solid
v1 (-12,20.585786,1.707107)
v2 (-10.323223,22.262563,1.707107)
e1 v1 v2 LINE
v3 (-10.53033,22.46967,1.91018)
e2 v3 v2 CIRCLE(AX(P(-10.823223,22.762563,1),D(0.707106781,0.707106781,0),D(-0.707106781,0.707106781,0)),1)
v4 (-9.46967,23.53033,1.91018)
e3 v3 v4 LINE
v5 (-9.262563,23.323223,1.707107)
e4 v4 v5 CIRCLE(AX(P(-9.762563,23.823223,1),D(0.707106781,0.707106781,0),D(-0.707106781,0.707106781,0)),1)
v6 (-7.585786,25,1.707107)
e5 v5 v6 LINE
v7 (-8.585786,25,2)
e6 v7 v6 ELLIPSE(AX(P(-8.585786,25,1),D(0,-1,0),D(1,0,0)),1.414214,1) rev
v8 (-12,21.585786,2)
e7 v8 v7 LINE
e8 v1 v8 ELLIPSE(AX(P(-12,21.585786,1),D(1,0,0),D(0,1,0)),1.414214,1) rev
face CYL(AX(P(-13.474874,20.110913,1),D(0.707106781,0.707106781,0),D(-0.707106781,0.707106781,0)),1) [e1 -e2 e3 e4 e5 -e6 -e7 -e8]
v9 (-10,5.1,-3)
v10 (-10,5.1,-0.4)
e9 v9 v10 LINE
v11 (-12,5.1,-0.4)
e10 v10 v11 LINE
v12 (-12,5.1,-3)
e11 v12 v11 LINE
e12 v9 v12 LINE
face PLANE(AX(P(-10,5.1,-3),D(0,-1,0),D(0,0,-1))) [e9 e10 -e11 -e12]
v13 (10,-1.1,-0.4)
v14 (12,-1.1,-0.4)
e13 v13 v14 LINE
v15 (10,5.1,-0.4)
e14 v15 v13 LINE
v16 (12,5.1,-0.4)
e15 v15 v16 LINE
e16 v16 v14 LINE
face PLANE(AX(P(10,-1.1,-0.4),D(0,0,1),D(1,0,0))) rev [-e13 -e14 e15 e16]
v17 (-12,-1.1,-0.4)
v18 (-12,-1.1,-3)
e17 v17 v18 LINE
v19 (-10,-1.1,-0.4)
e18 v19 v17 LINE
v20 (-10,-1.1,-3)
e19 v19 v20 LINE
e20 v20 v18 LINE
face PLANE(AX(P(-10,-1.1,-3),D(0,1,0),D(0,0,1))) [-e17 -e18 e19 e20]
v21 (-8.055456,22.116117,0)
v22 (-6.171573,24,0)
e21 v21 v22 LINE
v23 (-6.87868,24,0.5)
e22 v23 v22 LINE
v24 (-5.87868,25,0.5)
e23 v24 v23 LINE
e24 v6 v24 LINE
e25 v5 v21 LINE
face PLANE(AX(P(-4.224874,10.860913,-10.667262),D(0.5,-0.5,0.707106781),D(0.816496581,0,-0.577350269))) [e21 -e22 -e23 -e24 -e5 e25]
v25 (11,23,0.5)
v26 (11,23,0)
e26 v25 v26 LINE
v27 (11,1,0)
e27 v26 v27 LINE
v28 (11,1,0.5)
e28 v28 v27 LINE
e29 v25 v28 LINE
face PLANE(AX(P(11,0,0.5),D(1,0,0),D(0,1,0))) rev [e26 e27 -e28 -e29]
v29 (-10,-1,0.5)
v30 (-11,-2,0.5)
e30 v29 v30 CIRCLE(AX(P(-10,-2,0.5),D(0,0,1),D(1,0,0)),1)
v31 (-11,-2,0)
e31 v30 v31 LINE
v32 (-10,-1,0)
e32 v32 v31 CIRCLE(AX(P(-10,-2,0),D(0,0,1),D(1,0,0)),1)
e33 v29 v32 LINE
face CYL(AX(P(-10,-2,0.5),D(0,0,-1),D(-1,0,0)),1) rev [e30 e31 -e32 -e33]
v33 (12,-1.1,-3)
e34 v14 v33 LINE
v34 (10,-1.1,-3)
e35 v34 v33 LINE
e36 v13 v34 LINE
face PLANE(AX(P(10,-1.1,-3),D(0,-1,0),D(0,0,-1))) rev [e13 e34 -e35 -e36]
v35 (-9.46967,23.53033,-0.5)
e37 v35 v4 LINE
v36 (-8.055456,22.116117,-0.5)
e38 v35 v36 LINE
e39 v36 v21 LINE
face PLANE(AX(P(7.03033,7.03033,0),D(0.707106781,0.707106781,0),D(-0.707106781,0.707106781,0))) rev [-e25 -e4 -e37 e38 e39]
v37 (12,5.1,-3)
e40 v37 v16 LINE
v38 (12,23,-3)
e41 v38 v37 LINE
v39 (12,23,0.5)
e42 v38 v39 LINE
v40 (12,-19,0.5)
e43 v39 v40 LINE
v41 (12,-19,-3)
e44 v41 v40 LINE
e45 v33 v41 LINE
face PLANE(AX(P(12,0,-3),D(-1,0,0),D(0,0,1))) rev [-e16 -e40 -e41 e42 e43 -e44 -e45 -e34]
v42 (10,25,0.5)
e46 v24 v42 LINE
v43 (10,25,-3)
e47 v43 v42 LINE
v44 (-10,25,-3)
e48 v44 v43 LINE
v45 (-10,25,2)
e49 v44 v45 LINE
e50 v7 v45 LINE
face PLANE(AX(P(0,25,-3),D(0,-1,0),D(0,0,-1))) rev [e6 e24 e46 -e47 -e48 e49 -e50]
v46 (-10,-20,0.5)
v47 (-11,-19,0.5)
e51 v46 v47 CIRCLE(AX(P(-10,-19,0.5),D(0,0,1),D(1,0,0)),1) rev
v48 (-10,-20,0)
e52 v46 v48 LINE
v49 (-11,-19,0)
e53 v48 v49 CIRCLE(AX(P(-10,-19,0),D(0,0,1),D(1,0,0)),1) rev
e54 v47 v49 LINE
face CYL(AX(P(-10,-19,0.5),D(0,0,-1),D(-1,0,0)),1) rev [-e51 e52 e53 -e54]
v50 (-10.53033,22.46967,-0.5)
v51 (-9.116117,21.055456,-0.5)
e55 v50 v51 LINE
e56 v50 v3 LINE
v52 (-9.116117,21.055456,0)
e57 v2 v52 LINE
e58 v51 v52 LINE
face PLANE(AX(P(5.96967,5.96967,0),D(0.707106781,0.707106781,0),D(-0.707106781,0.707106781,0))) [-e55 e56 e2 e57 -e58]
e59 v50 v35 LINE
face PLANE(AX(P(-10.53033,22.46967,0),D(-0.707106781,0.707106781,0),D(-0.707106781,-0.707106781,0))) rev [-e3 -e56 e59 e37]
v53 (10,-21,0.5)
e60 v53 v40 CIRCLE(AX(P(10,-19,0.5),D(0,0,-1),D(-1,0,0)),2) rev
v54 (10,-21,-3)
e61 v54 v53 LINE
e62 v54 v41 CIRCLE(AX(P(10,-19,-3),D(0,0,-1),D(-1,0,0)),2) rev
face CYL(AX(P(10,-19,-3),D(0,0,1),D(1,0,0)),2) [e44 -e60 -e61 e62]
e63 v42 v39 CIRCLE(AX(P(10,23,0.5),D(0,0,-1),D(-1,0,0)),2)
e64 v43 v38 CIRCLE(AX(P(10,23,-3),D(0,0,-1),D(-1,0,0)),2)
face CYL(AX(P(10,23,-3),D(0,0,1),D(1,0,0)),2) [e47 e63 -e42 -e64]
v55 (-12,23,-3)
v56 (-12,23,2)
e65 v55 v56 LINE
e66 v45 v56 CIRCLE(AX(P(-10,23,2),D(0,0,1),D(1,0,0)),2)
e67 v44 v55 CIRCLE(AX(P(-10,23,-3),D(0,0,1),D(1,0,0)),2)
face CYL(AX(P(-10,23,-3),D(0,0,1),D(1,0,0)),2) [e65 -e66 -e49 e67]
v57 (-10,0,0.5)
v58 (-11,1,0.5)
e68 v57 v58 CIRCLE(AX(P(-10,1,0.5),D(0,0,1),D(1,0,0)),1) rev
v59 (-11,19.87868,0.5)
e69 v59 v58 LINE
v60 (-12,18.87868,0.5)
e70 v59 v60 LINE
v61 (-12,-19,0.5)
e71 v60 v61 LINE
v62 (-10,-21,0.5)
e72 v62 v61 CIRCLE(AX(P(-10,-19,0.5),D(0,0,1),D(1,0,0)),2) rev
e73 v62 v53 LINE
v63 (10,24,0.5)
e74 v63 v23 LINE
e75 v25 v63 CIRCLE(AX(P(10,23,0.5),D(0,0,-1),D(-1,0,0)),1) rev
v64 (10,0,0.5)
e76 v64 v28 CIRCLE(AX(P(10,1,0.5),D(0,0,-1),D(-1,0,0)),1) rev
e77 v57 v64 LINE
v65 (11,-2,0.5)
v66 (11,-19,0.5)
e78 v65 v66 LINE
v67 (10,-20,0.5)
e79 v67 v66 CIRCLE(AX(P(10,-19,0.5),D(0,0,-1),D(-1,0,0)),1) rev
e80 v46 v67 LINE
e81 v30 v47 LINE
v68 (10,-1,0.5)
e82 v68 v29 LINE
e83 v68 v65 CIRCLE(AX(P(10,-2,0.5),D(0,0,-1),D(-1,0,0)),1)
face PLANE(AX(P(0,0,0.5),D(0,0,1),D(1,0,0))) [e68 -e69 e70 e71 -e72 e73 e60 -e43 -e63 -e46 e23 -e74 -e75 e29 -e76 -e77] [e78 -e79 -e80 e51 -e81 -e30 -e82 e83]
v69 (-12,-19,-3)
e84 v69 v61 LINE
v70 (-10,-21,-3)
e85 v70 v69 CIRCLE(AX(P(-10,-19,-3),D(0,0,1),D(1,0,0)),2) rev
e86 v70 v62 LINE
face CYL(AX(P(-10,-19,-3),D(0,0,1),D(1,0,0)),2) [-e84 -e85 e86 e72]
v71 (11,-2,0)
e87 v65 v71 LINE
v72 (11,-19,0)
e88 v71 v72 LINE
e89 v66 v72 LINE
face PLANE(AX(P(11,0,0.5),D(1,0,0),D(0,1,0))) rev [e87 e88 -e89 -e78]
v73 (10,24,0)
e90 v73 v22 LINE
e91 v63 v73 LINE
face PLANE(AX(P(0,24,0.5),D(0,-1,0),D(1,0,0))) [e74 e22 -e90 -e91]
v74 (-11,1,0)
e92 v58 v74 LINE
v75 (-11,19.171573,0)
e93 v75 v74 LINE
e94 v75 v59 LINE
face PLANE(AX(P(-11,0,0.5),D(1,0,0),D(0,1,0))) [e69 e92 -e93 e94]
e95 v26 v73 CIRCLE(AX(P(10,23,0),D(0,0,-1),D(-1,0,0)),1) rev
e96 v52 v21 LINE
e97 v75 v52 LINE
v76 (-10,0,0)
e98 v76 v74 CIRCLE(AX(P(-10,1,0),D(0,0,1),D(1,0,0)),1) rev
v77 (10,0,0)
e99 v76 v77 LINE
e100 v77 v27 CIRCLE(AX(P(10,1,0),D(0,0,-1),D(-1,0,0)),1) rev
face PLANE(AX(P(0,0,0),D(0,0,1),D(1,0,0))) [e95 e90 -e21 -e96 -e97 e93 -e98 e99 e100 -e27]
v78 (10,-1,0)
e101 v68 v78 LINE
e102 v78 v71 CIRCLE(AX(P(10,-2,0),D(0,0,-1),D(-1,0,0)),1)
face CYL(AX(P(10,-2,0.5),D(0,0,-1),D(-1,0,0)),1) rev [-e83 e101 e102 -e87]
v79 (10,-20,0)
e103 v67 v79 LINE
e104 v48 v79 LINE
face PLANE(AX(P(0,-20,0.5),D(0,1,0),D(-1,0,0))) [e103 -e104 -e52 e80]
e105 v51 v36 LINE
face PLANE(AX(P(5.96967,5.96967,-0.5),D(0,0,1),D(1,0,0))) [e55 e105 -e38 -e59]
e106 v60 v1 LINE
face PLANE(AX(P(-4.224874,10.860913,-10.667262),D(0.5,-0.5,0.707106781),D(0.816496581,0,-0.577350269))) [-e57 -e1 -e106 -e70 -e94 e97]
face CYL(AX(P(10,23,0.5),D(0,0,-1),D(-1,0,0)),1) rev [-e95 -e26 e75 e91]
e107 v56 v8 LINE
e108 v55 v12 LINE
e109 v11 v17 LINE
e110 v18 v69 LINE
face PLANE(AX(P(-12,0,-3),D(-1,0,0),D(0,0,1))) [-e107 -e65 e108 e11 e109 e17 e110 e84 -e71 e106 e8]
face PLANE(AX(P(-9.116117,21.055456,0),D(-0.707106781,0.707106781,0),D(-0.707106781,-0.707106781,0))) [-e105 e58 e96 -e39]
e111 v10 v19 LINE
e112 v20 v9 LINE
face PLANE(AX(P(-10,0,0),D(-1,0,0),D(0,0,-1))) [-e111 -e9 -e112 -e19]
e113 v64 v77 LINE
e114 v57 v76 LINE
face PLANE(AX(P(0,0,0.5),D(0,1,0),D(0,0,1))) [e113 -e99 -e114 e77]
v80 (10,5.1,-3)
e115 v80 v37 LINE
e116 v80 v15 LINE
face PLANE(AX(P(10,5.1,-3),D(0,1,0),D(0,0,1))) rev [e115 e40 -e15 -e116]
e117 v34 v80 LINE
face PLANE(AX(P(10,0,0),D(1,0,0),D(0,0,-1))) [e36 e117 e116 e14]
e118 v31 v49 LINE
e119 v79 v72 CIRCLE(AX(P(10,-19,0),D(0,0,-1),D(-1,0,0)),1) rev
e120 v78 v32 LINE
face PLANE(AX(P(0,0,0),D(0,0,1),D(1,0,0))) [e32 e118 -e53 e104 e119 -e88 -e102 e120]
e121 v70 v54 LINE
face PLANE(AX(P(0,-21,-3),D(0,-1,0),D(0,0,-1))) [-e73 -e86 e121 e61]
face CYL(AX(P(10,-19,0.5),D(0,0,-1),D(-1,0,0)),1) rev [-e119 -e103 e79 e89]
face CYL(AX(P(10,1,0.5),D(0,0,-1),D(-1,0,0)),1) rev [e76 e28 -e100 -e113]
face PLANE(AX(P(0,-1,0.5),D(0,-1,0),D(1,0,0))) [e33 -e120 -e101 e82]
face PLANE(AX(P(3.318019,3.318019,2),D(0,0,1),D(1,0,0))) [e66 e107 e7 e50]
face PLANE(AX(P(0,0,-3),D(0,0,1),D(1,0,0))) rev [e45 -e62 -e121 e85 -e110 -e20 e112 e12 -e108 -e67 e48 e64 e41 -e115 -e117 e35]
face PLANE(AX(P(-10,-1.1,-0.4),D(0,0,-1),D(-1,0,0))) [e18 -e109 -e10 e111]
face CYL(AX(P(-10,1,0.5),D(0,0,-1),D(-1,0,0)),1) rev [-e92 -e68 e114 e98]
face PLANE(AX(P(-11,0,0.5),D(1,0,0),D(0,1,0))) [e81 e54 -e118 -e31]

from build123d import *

# Parameters (mm, degrees)
BASE_DEPTH                = 3
CORNER_MARK_DEPTH         = 4.5
CORNER_MARK_DEPTH_BACK    = 4.5
CORNER_SKETCH_3_W         = 2
CORNER_SKETCH_3_H         = 0.5
CORNER_MARK_CUTOUT_DEPTH  = 0.75
CORNER_FIT_CUT_DEPTH      = 32.616432581
CORNER_FIT_CUT_DEPTH_BACK = 32.616432581
BORDER_START              = -3
BORDER_DEPTH              = 3.5
BODY_MIRROR_START         = -3
BODY_MIRROR_DEPTH         = 3
BODY_MIRROR_2_DEPTH       = 0.5
MAGNET_CUTOUT_SKETCH_W    = 2.6
MAGNET_CUTOUT_SKETCH_H    = 6.2
MAGNET_CUTOUT_DEPTH       = 2


with BuildPart() as part:
    # base_sketch → base (new body)
    with BuildSketch(Plane.XY):
        with BuildLine():
            ThreePointArc((-10, 0), (-10.707106781, 0.292893219), (-11, 1))
            Line((-11, 1), (-11, 23))
            ThreePointArc((-11, 23), (-10.707106781, 23.707106781), (-10, 24))
            Line((-10, 24), (0, 24))
            Line((0, 24), (0, 0))
            Line((0, 0), (-10, 0))
        make_face()
        with BuildLine():
            Line((0, -1), (-10, -1))
            ThreePointArc((-10, -1), (-10.707106781, -1.292893219), (-11, -2))
            Line((-11, -2), (-11, -19))
            ThreePointArc((-11, -19), (-10.707106781, -19.707106781), (-10, -20))
            Line((-10, -20), (0, -20))
            Line((0, -20), (0, -1))
        make_face()
        with BuildLine():
            Line((-10, 0), (0, 0))
            Line((0, 0), (0, -1))
            Line((0, -1), (-10, -1))
            ThreePointArc((-10, -1), (-10.707106781, -1.292893219), (-11, -2))
            Line((-11, -2), (-11, -19))
            ThreePointArc((-11, -19), (-10.707106781, -19.707106781), (-10, -20))
            Line((-10, -20), (0, -20))
            Line((0, -20), (0, -21))
            Line((0, -21), (-10, -21))
            ThreePointArc((-10, -21), (-11.414213562, -20.414213562), (-12, -19))
            Line((-12, -19), (-12, 23))
            ThreePointArc((-12, 23), (-11.414213562, 24.414213562), (-10, 25))
            Line((-10, 25), (0, 25))
            Line((0, 25), (0, 24))
            Line((0, 24), (-10, 24))
            ThreePointArc((-10, 24), (-10.707106781, 23.707106781), (-11, 23))
            Line((-11, 23), (-11, 1))
            ThreePointArc((-11, 1), (-10.707106781, 0.292893219), (-10, 0))
        make_face()
    extrude(amount=-BASE_DEPTH)

    # corner_sketch → corner_mark (add, two sides: drawn at the far end of the back side and taken through both)
    with BuildSketch(Plane(origin=(6.5, 6.5, 0), x_dir=(0.7071067811865477, -0.7071067811865475, 0), z_dir=(0.7071067811865475, 0.7071067811865477, 0)).offset(-CORNER_MARK_DEPTH_BACK)):
        with BuildLine():
            Line((-23.334523779, 0), (-25.334523779, 0))
            Line((-25.334523779, 0), (-25.334523779, -2))
            Line((-25.334523779, -2), (-23.748737342, -2))
            ThreePointArc((-23.748737342, -2), (-23.536817216, -1.97728699), (-23.334523779, -1.910179721))
            Line((-23.334523779, -1.910179721), (-23.334523779, 0))
        make_face()
        with BuildLine():
            Line((-21.334523779, 0), (-23.334523779, 0))
            Line((-23.334523779, 0), (-23.334523779, -1.910179721))
            ThreePointArc((-23.334523779, -1.910179721), (-23.178957136, -1.821797126), (-23.04163056, -1.707106781))
            Line((-23.04163056, -1.707106781), (-21.334523779, 0))
        make_face()
    extrude(amount=CORNER_MARK_DEPTH + CORNER_MARK_DEPTH_BACK)

    # corner_sketch<3> → corner_mark_cutout (cut, symmetric)
    with BuildSketch(Plane(origin=(6.5, 6.5, 0), x_dir=(0.7071067811865477, -0.7071067811865475, 0), z_dir=(0.7071067811865475, 0.7071067811865477, 0))):
        with BuildLine():
            Line((-21.334523779, 0), (-23.334523779, 0))
            Line((-23.334523779, 0), (-23.334523779, -1.910179721))
            ThreePointArc((-23.334523779, -1.910179721), (-23.178957136, -1.821797126), (-23.04163056, -1.707106781))
            Line((-23.04163056, -1.707106781), (-21.334523779, 0))
        make_face()
        with Locations((-22.334523779, 0.25)):
            Rectangle(CORNER_SKETCH_3_W, CORNER_SKETCH_3_H)
    extrude(amount=CORNER_MARK_CUTOUT_DEPTH, both=True, mode=Mode.SUBTRACT)

    # Эскиз3 → corner_fit_cut (cut, two sides: drawn at the far end of the back side and taken through both)
    with BuildSketch(Plane(origin=(0, 0, -3), x_dir=(-1, 0, 0), z_dir=(0, 0, -1)).offset(-CORNER_FIT_CUT_DEPTH_BACK)):
        with BuildLine():
            Line((10, 25), (4.949214827, 25))
            Line((4.949214827, 25), (4.949214827, 29.369186308))
            Line((4.949214827, 29.369186308), (15.830436382, 29.369186308))
            Line((15.830436382, 29.369186308), (15.830436382, 18.313069579))
            Line((15.830436382, 18.313069579), (12, 18.313069579))
            Line((12, 18.313069579), (12, 23))
            ThreePointArc((12, 23), (11.414213562, 24.414213562), (10, 25))
        make_face()
    extrude(amount=CORNER_FIT_CUT_DEPTH + CORNER_FIT_CUT_DEPTH_BACK, mode=Mode.SUBTRACT)

    # border: read off the stored shape, not the designer's step
    # border outline → border (add)
    with BuildSketch(Plane.XY.offset(BORDER_START)):
        Polygon((0, 24), (0, 25), (-5.878679656, 25), (-6.878679656, 24), align=None)
        with BuildLine():
            ThreePointArc((-10, 0), (-10.707106781, 0.292893219), (-11, 1))
            Line((-11, 1), (-11, 19.878679656))
            Line((-11, 19.878679656), (-12, 18.878679656))
            Line((-12, 18.878679656), (-12, -19))
            ThreePointArc((-12, -19), (-11.414213562, -20.414213562), (-10, -21))
            Line((-10, -21), (0, -21))
            Line((0, -21), (0, -20))
            Line((0, -20), (-10, -20))
            ThreePointArc((-10, -20), (-10.707106781, -19.707106781), (-11, -19))
            Line((-11, -19), (-11, -2))
            ThreePointArc((-11, -2), (-10.707106781, -1.292893219), (-10, -1))
            Line((-10, -1), (0, -1))
            Line((0, -1), (0, 0))
            Line((0, 0), (-10, 0))
        make_face()
    extrude(amount=BORDER_DEPTH)

    # body_mirror: read off the stored shape, not the designer's step
    # body_mirror outline → body_mirror (add)
    with BuildSketch(Plane.XY.offset(BODY_MIRROR_START)):
        with BuildLine():
            Line((0, -21), (10, -21))
            ThreePointArc((10, -21), (11.414213562, -20.414213562), (12, -19))
            Line((12, -19), (12, 23))
            ThreePointArc((12, 23), (11.414213562, 24.414213562), (10, 25))
            Line((10, 25), (0, 25))
            Line((0, 25), (0, -21))
        make_face()
    extrude(amount=BODY_MIRROR_DEPTH)

    # body_mirror 2 outline → body_mirror 2 (add)
    with BuildSketch(Plane.XY):
        with BuildLine():
            Line((0, -20), (0, -21))
            Line((0, -21), (10, -21))
            ThreePointArc((10, -21), (11.414213562, -20.414213562), (12, -19))
            Line((12, -19), (12, 23))
            ThreePointArc((12, 23), (11.414213562, 24.414213562), (10, 25))
            Line((10, 25), (0, 25))
            Line((0, 25), (0, 24))
            Line((0, 24), (10, 24))
            ThreePointArc((10, 24), (10.707106781, 23.707106781), (11, 23))
            Line((11, 23), (11, 1))
            ThreePointArc((11, 1), (10.707106781, 0.292893219), (10, 0))
            Line((10, 0), (0, 0))
            Line((0, 0), (0, -1))
            Line((0, -1), (10, -1))
            ThreePointArc((10, -1), (10.707106781, -1.292893219), (11, -2))
            Line((11, -2), (11, -19))
            ThreePointArc((11, -19), (10.707106781, -19.707106781), (10, -20))
            Line((10, -20), (0, -20))
        make_face()
    extrude(amount=BODY_MIRROR_2_DEPTH)

    # magnet_cutout_sketch → magnet_cutout (cut)
    with BuildSketch(Plane(origin=(12, 0, 0), x_dir=(0, 0, -1), z_dir=(1, 0, 0))):
        with Locations((1.7, 2)):
            Rectangle(MAGNET_CUTOUT_SKETCH_W, MAGNET_CUTOUT_SKETCH_H)
    magnet_cutout = extrude(amount=-MAGNET_CUTOUT_DEPTH, mode=Mode.SUBTRACT)

    # magnet_cutout_mirror: magnet_cutout across plane
    add(magnet_cutout.mirror(Plane(origin=(0, 0, 0), x_dir=(0, 0, 1), z_dir=(1, 0, 0))), mode=Mode.SUBTRACT)


solid = part.part
